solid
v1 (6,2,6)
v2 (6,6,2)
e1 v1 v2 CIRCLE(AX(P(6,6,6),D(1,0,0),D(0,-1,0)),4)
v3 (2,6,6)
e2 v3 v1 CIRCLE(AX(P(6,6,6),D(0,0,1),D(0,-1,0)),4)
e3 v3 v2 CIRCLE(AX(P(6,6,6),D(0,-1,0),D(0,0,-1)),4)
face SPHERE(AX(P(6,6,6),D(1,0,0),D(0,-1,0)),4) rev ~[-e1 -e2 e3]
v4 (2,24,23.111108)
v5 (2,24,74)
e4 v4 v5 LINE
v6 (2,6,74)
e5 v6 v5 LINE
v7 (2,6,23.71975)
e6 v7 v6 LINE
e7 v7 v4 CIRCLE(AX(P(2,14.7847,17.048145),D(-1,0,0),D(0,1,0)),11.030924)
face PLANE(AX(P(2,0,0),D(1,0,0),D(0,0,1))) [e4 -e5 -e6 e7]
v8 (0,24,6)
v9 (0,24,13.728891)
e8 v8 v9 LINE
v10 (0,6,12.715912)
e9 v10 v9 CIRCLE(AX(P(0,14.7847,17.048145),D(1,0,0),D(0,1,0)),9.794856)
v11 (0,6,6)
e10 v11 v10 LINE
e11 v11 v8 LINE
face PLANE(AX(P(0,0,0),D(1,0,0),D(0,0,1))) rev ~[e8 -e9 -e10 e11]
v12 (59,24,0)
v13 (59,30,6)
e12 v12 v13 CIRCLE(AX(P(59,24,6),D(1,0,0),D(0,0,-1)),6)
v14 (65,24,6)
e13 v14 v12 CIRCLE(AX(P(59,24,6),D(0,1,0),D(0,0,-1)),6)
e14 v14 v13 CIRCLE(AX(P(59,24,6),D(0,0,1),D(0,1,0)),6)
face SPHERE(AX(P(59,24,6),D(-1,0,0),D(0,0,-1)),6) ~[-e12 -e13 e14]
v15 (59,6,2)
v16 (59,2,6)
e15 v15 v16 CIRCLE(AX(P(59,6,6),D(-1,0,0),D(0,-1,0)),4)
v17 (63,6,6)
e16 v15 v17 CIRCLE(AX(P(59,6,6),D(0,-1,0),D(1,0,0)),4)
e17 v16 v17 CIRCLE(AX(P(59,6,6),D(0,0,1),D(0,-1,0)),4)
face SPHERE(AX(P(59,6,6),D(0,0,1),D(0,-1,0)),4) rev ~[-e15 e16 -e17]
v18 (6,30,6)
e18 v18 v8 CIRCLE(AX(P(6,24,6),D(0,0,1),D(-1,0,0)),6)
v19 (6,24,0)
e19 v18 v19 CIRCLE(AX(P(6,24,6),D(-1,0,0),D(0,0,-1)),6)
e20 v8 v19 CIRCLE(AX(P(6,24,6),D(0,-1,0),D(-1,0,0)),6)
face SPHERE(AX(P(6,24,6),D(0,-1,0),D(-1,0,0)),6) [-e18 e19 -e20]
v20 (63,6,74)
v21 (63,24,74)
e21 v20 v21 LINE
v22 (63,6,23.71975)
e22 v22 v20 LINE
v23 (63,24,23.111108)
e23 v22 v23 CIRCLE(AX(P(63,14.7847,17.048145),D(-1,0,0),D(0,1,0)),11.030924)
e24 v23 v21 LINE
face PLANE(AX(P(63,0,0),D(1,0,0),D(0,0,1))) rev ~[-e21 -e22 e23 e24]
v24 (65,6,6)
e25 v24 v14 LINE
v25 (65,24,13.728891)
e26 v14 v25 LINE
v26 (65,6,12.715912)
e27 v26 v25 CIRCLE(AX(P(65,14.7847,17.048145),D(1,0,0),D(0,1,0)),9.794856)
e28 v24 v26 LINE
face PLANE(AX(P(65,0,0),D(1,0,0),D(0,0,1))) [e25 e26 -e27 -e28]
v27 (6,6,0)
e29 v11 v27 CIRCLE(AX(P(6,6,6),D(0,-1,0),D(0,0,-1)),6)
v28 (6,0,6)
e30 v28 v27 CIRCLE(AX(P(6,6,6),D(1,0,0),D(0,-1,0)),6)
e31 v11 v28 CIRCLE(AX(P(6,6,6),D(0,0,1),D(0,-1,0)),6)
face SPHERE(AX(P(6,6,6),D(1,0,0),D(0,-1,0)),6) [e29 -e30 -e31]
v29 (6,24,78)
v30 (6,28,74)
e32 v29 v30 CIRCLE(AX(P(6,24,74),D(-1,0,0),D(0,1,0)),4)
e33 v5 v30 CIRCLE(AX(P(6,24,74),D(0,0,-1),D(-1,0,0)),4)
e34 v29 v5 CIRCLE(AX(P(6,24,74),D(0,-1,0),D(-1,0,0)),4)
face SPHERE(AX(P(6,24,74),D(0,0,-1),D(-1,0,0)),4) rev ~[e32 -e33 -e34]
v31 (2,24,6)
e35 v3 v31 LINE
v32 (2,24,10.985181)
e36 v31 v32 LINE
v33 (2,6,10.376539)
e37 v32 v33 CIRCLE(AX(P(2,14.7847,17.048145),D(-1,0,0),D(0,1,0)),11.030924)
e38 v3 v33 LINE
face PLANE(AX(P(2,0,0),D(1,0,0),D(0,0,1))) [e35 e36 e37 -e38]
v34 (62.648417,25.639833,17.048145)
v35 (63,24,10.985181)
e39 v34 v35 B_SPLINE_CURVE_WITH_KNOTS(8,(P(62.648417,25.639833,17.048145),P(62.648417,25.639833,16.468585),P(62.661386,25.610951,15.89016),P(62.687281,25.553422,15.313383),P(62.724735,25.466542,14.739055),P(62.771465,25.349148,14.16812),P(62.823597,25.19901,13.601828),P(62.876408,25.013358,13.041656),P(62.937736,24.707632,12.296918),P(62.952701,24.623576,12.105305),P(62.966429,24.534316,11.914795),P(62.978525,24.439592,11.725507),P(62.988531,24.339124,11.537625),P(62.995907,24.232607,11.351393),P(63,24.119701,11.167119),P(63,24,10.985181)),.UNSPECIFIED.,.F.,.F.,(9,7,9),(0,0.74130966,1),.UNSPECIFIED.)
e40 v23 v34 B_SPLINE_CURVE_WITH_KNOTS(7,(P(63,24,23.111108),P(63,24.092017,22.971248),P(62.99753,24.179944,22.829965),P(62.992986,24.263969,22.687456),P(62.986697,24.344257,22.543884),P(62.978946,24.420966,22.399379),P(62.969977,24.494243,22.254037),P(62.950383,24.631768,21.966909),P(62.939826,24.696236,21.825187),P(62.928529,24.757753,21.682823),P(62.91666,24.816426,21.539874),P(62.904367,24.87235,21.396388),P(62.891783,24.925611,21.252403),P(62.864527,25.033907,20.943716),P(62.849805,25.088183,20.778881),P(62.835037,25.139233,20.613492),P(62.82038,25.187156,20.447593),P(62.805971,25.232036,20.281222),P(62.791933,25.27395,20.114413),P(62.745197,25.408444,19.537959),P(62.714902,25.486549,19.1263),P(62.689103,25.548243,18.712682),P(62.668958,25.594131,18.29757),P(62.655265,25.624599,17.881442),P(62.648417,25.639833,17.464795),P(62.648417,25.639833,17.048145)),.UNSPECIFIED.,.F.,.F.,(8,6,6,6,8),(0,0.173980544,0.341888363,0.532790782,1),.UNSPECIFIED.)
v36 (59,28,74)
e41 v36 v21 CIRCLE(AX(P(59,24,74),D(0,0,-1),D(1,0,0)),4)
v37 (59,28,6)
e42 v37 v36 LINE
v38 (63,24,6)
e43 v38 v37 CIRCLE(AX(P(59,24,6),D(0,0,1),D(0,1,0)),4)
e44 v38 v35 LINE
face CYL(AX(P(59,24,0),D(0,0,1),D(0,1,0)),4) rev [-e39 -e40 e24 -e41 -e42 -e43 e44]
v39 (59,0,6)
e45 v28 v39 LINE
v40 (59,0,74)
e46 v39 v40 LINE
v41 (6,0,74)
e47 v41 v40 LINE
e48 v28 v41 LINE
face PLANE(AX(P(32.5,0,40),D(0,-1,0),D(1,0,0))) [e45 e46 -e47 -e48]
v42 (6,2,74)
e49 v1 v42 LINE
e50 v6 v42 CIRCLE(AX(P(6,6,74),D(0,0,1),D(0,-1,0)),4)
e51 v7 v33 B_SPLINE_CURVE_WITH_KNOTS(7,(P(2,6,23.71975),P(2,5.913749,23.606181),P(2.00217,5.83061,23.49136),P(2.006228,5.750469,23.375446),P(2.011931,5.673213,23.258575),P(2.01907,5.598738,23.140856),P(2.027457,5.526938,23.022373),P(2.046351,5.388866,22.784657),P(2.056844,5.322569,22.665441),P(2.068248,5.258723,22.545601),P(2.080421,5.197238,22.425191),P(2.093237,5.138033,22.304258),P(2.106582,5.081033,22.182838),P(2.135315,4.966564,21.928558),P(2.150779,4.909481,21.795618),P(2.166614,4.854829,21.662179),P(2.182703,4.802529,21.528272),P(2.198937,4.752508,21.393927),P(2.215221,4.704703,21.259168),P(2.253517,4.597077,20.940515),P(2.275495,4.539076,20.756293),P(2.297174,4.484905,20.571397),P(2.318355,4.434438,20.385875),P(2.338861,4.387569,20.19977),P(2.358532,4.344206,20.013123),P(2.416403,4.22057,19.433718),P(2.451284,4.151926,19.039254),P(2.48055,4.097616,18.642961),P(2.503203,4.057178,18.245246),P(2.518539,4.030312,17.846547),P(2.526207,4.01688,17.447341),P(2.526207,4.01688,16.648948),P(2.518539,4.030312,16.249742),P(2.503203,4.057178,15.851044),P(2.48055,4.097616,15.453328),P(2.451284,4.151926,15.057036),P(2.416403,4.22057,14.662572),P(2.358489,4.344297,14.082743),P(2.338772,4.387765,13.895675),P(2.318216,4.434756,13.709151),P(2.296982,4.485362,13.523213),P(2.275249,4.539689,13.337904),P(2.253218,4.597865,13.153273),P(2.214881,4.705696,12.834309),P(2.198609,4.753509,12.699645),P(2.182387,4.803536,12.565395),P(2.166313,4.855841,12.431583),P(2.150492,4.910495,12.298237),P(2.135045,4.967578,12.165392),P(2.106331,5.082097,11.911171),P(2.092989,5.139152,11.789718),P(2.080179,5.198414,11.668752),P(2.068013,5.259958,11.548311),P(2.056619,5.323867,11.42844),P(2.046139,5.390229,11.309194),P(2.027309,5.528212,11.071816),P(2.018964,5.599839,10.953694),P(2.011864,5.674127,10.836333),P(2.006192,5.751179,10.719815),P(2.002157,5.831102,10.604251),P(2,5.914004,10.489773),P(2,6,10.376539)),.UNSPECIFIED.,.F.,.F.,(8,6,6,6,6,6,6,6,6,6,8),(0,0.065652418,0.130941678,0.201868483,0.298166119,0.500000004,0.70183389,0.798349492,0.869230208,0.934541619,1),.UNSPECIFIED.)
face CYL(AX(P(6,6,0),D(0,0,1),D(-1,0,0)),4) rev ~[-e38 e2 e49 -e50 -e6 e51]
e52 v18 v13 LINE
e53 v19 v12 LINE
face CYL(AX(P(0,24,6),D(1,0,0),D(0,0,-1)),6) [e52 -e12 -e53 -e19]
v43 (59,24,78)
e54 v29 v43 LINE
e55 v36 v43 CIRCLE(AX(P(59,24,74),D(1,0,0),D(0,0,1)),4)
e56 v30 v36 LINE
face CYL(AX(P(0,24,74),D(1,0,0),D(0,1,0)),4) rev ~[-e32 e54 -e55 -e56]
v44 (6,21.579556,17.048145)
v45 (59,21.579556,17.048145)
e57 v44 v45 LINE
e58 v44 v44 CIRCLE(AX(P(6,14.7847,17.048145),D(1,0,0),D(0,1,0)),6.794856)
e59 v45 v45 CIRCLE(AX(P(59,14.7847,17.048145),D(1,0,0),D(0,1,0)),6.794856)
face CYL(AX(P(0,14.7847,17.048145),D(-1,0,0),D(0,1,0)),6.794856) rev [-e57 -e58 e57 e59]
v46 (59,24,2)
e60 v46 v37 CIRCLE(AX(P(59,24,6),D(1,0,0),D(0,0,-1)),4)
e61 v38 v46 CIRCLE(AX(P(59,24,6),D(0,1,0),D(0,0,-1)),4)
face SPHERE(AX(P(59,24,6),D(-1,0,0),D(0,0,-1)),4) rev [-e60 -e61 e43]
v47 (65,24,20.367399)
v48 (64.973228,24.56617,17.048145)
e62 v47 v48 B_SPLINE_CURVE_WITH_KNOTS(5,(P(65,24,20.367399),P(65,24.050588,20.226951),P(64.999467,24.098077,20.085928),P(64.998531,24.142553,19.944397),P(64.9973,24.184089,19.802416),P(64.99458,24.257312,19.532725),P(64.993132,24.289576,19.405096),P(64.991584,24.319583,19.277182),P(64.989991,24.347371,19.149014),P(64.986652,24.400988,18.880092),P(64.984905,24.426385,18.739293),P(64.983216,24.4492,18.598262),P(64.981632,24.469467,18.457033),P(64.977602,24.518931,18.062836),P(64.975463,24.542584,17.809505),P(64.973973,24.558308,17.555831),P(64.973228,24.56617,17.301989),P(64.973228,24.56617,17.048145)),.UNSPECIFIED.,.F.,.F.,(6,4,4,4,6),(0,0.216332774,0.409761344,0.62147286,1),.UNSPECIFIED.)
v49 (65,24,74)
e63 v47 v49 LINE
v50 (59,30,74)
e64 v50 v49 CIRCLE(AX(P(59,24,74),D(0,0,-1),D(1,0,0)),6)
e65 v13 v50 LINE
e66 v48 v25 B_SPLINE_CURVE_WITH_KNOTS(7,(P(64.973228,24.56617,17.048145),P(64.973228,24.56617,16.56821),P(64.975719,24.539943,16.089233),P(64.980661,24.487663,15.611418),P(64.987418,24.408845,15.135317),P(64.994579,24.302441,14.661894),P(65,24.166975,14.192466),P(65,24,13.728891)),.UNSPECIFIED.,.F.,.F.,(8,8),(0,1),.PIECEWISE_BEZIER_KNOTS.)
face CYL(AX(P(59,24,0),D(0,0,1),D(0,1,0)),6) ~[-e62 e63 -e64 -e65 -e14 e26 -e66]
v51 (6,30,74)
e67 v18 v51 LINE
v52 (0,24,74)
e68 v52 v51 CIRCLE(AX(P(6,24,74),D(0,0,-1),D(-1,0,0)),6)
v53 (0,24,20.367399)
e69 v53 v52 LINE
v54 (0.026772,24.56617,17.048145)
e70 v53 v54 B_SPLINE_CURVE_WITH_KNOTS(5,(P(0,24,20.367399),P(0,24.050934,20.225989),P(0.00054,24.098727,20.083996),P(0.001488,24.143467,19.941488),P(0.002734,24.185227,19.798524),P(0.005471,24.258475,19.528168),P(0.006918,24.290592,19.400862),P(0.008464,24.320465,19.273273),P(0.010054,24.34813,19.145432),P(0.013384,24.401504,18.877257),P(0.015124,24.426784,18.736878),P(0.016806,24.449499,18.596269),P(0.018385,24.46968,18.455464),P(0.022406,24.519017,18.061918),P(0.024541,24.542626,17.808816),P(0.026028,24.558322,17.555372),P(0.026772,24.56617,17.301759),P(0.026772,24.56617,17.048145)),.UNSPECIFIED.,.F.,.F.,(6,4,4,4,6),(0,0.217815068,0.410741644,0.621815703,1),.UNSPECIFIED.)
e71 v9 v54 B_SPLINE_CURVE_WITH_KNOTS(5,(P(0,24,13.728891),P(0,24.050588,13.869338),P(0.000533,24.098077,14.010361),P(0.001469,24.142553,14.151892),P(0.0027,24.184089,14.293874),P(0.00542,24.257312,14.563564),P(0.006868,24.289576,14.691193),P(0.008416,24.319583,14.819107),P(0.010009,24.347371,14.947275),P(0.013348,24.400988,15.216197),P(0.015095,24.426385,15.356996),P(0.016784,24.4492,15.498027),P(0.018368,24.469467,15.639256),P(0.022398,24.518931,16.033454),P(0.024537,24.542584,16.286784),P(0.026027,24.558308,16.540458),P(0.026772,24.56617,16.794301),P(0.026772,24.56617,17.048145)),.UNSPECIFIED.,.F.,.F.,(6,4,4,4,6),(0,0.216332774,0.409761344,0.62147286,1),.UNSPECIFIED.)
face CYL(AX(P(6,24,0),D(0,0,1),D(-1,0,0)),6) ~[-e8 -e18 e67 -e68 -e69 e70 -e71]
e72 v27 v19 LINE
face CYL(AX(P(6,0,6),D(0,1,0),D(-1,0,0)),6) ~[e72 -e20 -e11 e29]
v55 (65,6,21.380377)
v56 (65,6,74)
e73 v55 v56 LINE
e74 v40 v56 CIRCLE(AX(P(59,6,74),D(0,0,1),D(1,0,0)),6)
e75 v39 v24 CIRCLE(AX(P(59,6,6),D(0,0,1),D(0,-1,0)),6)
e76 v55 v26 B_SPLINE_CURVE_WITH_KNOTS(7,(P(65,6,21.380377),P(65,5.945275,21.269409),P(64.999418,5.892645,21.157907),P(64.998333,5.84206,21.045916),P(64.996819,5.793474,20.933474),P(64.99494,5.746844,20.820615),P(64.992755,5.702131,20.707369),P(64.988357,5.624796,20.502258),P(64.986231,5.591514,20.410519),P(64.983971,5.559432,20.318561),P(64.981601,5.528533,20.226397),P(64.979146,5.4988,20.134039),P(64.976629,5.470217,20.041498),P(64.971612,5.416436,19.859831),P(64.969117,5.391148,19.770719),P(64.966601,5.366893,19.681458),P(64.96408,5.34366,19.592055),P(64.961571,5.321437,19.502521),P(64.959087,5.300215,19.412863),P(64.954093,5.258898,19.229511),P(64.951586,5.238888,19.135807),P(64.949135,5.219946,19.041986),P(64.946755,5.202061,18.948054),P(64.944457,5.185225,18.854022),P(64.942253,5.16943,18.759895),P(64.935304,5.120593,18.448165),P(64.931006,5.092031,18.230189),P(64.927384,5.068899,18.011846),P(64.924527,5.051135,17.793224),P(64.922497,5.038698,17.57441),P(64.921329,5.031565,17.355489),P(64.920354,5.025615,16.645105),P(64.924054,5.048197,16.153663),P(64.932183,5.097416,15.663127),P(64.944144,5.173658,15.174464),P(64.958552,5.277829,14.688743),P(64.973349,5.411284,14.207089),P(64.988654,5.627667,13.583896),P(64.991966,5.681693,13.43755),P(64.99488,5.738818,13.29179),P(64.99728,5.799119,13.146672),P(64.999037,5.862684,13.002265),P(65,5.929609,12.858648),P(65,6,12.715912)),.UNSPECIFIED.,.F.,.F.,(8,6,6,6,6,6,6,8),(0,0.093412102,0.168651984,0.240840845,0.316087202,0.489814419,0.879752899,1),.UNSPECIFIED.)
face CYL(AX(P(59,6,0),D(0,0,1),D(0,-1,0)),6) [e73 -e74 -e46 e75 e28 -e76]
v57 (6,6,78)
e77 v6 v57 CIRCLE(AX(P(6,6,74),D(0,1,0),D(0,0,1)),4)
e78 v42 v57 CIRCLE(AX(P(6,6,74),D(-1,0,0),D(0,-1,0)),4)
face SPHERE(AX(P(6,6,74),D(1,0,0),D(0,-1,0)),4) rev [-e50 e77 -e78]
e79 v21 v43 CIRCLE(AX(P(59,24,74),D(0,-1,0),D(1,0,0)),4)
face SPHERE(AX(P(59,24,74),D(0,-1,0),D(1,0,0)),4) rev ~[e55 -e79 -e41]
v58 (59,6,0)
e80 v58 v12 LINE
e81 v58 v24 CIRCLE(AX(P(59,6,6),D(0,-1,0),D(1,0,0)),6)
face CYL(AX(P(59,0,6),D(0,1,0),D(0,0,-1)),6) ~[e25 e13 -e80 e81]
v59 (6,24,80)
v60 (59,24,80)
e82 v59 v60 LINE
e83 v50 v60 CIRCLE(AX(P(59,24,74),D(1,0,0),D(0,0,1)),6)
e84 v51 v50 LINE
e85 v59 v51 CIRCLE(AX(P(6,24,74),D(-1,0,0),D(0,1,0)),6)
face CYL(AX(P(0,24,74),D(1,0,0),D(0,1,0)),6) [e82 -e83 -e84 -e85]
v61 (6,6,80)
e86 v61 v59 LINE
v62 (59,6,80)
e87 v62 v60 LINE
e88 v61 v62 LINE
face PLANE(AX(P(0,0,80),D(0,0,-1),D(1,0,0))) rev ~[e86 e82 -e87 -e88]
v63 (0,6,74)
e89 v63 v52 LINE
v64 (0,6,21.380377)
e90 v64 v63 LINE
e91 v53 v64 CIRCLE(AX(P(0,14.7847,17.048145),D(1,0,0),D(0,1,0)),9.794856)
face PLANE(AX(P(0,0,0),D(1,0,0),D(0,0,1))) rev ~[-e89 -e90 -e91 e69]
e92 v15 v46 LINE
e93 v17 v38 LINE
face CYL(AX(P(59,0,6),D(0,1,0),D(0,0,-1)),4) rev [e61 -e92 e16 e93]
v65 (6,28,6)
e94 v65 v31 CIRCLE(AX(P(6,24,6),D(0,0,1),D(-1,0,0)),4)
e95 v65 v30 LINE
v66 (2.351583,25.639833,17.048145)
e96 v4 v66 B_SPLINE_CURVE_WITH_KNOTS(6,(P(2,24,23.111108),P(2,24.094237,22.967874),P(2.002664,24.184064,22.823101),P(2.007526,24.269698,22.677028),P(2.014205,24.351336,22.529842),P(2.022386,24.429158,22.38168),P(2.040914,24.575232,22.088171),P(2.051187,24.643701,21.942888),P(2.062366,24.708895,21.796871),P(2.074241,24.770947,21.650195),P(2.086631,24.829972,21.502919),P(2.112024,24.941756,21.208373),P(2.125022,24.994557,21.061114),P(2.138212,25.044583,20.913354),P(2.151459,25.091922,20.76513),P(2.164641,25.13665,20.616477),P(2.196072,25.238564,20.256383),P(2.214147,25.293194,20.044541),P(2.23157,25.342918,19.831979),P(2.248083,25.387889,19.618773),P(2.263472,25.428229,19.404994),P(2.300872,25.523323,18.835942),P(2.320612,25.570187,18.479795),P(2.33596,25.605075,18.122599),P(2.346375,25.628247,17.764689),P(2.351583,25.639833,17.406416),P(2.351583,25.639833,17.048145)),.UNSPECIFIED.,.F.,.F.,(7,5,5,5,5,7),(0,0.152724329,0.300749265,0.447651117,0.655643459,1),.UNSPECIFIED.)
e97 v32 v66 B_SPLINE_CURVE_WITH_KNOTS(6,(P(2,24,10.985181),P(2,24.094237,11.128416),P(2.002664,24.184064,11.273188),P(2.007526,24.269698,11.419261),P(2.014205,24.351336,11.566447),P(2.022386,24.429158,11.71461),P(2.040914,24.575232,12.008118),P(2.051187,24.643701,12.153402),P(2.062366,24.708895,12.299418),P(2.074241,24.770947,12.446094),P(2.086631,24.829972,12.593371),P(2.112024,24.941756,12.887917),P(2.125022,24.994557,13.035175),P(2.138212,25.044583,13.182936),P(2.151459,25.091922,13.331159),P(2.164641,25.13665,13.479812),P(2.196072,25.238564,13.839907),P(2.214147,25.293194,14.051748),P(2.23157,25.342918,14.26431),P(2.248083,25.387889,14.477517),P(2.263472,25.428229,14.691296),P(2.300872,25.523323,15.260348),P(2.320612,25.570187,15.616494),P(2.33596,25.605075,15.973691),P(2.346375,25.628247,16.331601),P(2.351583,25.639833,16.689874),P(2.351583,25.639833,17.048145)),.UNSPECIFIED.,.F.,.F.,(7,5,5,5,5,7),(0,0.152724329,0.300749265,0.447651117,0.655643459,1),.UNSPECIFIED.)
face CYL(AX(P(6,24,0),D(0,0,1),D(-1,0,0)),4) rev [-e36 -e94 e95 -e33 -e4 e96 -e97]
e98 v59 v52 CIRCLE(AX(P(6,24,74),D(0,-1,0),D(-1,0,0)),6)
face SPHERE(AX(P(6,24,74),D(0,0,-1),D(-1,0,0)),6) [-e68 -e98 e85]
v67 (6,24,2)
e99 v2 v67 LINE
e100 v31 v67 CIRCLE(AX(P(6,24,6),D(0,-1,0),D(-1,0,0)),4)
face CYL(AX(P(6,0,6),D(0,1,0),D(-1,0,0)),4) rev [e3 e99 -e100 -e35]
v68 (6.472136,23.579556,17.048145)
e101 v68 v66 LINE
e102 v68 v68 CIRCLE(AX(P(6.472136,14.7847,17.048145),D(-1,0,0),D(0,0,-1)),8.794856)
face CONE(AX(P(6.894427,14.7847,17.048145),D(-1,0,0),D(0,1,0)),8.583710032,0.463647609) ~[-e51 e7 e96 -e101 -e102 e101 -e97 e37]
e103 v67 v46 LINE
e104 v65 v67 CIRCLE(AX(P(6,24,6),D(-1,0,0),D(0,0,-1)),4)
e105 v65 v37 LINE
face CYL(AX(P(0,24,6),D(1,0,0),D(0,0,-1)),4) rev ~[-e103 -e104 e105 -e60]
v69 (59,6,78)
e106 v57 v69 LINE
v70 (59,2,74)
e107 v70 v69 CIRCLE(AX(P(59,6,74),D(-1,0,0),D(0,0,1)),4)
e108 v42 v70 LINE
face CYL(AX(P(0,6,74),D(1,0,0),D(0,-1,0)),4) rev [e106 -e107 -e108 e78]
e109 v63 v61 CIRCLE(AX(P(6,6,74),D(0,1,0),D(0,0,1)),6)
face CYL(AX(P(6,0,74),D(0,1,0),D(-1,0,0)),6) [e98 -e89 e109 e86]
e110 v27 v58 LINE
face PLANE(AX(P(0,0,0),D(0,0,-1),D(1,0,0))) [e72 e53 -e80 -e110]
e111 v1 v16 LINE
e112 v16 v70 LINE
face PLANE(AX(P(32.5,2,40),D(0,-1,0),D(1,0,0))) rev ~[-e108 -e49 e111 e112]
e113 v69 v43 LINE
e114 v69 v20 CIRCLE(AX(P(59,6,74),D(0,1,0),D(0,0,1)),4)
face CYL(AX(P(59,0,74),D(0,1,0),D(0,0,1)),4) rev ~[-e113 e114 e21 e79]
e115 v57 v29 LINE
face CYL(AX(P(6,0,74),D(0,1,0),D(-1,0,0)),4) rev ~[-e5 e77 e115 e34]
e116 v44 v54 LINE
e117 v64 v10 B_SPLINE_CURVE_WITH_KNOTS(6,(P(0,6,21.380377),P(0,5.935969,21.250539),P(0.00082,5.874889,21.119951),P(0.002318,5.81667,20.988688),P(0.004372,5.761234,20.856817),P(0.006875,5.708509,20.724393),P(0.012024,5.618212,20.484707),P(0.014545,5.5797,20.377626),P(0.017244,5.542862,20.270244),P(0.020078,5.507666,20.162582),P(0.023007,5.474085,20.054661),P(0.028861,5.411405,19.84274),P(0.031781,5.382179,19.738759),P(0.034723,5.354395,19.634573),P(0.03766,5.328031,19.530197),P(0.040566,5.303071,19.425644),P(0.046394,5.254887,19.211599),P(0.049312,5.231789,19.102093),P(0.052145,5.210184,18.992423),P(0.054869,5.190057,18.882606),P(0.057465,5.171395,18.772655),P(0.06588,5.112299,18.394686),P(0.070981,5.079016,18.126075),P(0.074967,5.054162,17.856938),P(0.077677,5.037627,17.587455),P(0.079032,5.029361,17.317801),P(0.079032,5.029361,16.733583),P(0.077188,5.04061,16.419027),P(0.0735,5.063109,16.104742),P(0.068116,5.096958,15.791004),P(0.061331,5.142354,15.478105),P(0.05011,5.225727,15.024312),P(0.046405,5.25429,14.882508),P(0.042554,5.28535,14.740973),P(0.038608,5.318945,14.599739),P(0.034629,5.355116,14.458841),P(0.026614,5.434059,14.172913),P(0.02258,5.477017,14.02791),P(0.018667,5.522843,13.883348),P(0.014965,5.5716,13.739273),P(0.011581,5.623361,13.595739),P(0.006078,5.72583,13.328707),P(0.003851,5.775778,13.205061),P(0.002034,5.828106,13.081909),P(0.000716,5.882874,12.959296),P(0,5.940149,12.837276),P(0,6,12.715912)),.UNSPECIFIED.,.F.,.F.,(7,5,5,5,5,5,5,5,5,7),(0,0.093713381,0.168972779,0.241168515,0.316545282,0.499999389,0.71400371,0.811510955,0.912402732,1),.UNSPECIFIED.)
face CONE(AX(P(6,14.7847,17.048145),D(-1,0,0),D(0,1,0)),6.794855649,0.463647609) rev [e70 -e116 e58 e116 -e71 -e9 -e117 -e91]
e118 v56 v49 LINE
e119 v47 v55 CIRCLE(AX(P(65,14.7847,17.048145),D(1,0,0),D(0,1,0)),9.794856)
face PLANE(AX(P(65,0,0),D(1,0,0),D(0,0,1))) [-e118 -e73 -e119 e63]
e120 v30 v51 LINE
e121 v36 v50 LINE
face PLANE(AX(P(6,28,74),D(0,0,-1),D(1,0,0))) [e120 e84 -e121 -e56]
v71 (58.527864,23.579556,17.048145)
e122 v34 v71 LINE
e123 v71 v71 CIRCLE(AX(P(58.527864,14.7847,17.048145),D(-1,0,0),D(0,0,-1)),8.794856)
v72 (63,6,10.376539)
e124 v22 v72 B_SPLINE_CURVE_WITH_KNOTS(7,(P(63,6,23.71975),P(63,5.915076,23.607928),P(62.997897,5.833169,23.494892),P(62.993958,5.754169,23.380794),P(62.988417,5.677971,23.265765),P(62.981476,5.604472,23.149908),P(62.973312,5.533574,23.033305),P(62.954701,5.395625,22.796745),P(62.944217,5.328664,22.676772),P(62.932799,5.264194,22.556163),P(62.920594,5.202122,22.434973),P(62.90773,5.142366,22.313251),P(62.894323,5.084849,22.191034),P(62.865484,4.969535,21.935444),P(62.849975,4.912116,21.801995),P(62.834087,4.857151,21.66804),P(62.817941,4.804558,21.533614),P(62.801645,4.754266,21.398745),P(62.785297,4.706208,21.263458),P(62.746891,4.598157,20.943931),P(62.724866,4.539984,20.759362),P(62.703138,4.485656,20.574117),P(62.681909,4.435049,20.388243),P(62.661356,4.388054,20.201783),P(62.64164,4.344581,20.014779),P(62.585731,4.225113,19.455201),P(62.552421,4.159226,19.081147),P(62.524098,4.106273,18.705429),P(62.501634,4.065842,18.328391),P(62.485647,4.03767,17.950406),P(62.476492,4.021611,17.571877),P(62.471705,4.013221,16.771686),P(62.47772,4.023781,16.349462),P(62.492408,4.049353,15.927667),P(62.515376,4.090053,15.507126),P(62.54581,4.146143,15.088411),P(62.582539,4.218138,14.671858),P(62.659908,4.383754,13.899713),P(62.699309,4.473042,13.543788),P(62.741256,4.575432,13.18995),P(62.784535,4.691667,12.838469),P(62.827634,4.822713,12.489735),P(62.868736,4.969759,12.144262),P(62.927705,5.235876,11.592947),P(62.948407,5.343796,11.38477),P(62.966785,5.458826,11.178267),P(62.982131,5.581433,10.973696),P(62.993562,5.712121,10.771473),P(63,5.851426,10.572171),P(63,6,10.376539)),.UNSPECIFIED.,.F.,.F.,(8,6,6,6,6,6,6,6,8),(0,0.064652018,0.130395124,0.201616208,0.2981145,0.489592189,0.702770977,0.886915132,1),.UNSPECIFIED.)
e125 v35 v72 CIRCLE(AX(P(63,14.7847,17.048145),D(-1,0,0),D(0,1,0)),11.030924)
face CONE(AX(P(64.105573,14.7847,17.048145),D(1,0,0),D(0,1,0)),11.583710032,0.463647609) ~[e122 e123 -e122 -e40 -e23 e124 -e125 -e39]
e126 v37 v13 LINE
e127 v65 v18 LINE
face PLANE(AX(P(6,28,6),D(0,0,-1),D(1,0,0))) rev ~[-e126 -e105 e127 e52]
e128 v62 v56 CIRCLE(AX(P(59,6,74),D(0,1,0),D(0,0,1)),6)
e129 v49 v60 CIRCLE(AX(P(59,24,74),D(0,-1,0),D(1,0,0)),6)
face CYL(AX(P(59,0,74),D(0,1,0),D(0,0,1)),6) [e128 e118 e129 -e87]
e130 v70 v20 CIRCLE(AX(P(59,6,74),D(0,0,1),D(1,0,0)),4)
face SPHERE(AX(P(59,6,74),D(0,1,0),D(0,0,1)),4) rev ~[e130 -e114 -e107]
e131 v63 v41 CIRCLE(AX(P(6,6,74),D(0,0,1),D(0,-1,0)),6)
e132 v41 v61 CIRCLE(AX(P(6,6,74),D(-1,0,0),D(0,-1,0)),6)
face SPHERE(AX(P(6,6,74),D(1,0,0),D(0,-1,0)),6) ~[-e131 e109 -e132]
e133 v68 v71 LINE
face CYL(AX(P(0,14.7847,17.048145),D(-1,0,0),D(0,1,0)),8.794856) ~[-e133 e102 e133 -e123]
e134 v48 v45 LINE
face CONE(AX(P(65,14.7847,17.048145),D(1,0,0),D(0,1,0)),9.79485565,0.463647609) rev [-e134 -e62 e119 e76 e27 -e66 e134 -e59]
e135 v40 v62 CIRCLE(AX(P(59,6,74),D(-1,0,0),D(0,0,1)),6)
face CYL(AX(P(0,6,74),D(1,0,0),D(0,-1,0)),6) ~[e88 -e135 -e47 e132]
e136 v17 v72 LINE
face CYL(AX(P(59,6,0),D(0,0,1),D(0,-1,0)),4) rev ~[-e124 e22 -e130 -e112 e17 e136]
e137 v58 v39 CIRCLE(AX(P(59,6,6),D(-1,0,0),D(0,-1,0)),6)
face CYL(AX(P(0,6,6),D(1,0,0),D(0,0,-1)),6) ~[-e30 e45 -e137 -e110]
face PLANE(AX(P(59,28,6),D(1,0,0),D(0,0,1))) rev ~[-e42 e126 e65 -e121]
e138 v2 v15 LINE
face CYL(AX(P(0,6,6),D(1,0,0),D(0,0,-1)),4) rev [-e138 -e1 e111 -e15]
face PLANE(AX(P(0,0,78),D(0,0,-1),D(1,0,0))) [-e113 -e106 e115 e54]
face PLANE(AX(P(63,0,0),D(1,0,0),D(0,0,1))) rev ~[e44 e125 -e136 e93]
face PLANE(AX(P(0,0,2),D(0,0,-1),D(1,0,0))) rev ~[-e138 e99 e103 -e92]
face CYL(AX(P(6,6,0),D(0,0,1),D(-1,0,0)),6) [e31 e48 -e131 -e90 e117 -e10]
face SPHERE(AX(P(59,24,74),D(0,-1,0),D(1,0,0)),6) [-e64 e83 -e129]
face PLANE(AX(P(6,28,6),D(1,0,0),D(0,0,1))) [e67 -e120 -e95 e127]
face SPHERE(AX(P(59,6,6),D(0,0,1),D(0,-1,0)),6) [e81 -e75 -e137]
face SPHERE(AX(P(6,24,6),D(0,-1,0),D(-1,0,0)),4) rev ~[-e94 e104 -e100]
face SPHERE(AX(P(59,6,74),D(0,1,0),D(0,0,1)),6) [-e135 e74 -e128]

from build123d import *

# Parameters (mm, degrees)
F0_W     = 65
F0_H     = 80
F1_DEPTH = 30
F2_R     = 6.7948556495
F3_DEPTH = 65
F4_R     = 6
F6_T     = -2


# Not quite as in the source:
# - a fillet or chamfer that OpenCascade refuses, or shapes differently, is made with other operations: its cross-section is extruded or revolved along the edge and cut away or added
# - a shell that OpenCascade refuses in one call is made with other operations: the cavity is built on its own and cut out


with BuildPart() as f1:
    # F0 (on Front) → F1 (new body)
    with BuildSketch(Plane.XZ):
        with Locations((32.5, 40)):
            Rectangle(F0_W, F0_H)
    extrude(amount=-F1_DEPTH)

    # F2 (on Right) → F3 (cut, through all)
    with BuildSketch(Plane.YZ):
        with Locations((14.7847002372, 17.048144713)):
            Circle(F2_R)
    extrude(amount=F3_DEPTH, mode=Mode.SUBTRACT)

    # F4
    f4_edges = [f1.edges().sort_by_distance(p)[0] for p in [
        (65, 15, 80),
        (32.5, 0, 80),
        (65, 0, 40),
        (32.5, 0, 0),
        (0, 0, 40),
        (0, 15, 0),
        (0, 30, 40),
        (32.5, 30, 0),
        (65, 15, 0),
        (0, 15, 80),
        (65, 30, 40),
        (32.5, 30, 80),
    ]]
    fillet(f4_edges, radius=F4_R)

    # F5: chamfer of 3 x 6 on 3 edges, made by hand

    # F5_s1 → F5_t2 (revolve, cut)
    with BuildSketch(Plane.XY.offset(17.048144713)):
        Polygon((65, 24.5795558867), (59, 21.5795558867), (65, 21.5795558867), align=None)
    revolve(axis=Axis((65, 14.7847002372, 17.048144713), (1, 0, 0)), mode=Mode.SUBTRACT)

    # F5_s3 → F5_t4 (revolve, cut)
    with BuildSketch(Plane.XY.offset(17.048144713)):
        Polygon((6, 21.5795558867), (0, 24.5795558867), (0, 21.5795558867), align=None)
    revolve(axis=Axis((0, 14.7847002372, 17.048144713), (1, 0, 0)), mode=Mode.SUBTRACT)

    # F6: a shell. OpenCascade refuses it in one call, so the cavity is built on its own and cut out:
    # the body offset inwards by the wall thickness, plus a prism from it out through each open face.
    f6_core = offset(f1.part, amount=F6_T, mode=Mode.PRIVATE)
    f6_exits = [f6_core.faces().sort_by_distance(p)[0] for p in [
        (32.5, 28, 40),
    ]]
    add(f6_core, mode=Mode.SUBTRACT)
    extrude(f6_exits, amount=-F6_T, mode=Mode.SUBTRACT)


solid = f1.part
